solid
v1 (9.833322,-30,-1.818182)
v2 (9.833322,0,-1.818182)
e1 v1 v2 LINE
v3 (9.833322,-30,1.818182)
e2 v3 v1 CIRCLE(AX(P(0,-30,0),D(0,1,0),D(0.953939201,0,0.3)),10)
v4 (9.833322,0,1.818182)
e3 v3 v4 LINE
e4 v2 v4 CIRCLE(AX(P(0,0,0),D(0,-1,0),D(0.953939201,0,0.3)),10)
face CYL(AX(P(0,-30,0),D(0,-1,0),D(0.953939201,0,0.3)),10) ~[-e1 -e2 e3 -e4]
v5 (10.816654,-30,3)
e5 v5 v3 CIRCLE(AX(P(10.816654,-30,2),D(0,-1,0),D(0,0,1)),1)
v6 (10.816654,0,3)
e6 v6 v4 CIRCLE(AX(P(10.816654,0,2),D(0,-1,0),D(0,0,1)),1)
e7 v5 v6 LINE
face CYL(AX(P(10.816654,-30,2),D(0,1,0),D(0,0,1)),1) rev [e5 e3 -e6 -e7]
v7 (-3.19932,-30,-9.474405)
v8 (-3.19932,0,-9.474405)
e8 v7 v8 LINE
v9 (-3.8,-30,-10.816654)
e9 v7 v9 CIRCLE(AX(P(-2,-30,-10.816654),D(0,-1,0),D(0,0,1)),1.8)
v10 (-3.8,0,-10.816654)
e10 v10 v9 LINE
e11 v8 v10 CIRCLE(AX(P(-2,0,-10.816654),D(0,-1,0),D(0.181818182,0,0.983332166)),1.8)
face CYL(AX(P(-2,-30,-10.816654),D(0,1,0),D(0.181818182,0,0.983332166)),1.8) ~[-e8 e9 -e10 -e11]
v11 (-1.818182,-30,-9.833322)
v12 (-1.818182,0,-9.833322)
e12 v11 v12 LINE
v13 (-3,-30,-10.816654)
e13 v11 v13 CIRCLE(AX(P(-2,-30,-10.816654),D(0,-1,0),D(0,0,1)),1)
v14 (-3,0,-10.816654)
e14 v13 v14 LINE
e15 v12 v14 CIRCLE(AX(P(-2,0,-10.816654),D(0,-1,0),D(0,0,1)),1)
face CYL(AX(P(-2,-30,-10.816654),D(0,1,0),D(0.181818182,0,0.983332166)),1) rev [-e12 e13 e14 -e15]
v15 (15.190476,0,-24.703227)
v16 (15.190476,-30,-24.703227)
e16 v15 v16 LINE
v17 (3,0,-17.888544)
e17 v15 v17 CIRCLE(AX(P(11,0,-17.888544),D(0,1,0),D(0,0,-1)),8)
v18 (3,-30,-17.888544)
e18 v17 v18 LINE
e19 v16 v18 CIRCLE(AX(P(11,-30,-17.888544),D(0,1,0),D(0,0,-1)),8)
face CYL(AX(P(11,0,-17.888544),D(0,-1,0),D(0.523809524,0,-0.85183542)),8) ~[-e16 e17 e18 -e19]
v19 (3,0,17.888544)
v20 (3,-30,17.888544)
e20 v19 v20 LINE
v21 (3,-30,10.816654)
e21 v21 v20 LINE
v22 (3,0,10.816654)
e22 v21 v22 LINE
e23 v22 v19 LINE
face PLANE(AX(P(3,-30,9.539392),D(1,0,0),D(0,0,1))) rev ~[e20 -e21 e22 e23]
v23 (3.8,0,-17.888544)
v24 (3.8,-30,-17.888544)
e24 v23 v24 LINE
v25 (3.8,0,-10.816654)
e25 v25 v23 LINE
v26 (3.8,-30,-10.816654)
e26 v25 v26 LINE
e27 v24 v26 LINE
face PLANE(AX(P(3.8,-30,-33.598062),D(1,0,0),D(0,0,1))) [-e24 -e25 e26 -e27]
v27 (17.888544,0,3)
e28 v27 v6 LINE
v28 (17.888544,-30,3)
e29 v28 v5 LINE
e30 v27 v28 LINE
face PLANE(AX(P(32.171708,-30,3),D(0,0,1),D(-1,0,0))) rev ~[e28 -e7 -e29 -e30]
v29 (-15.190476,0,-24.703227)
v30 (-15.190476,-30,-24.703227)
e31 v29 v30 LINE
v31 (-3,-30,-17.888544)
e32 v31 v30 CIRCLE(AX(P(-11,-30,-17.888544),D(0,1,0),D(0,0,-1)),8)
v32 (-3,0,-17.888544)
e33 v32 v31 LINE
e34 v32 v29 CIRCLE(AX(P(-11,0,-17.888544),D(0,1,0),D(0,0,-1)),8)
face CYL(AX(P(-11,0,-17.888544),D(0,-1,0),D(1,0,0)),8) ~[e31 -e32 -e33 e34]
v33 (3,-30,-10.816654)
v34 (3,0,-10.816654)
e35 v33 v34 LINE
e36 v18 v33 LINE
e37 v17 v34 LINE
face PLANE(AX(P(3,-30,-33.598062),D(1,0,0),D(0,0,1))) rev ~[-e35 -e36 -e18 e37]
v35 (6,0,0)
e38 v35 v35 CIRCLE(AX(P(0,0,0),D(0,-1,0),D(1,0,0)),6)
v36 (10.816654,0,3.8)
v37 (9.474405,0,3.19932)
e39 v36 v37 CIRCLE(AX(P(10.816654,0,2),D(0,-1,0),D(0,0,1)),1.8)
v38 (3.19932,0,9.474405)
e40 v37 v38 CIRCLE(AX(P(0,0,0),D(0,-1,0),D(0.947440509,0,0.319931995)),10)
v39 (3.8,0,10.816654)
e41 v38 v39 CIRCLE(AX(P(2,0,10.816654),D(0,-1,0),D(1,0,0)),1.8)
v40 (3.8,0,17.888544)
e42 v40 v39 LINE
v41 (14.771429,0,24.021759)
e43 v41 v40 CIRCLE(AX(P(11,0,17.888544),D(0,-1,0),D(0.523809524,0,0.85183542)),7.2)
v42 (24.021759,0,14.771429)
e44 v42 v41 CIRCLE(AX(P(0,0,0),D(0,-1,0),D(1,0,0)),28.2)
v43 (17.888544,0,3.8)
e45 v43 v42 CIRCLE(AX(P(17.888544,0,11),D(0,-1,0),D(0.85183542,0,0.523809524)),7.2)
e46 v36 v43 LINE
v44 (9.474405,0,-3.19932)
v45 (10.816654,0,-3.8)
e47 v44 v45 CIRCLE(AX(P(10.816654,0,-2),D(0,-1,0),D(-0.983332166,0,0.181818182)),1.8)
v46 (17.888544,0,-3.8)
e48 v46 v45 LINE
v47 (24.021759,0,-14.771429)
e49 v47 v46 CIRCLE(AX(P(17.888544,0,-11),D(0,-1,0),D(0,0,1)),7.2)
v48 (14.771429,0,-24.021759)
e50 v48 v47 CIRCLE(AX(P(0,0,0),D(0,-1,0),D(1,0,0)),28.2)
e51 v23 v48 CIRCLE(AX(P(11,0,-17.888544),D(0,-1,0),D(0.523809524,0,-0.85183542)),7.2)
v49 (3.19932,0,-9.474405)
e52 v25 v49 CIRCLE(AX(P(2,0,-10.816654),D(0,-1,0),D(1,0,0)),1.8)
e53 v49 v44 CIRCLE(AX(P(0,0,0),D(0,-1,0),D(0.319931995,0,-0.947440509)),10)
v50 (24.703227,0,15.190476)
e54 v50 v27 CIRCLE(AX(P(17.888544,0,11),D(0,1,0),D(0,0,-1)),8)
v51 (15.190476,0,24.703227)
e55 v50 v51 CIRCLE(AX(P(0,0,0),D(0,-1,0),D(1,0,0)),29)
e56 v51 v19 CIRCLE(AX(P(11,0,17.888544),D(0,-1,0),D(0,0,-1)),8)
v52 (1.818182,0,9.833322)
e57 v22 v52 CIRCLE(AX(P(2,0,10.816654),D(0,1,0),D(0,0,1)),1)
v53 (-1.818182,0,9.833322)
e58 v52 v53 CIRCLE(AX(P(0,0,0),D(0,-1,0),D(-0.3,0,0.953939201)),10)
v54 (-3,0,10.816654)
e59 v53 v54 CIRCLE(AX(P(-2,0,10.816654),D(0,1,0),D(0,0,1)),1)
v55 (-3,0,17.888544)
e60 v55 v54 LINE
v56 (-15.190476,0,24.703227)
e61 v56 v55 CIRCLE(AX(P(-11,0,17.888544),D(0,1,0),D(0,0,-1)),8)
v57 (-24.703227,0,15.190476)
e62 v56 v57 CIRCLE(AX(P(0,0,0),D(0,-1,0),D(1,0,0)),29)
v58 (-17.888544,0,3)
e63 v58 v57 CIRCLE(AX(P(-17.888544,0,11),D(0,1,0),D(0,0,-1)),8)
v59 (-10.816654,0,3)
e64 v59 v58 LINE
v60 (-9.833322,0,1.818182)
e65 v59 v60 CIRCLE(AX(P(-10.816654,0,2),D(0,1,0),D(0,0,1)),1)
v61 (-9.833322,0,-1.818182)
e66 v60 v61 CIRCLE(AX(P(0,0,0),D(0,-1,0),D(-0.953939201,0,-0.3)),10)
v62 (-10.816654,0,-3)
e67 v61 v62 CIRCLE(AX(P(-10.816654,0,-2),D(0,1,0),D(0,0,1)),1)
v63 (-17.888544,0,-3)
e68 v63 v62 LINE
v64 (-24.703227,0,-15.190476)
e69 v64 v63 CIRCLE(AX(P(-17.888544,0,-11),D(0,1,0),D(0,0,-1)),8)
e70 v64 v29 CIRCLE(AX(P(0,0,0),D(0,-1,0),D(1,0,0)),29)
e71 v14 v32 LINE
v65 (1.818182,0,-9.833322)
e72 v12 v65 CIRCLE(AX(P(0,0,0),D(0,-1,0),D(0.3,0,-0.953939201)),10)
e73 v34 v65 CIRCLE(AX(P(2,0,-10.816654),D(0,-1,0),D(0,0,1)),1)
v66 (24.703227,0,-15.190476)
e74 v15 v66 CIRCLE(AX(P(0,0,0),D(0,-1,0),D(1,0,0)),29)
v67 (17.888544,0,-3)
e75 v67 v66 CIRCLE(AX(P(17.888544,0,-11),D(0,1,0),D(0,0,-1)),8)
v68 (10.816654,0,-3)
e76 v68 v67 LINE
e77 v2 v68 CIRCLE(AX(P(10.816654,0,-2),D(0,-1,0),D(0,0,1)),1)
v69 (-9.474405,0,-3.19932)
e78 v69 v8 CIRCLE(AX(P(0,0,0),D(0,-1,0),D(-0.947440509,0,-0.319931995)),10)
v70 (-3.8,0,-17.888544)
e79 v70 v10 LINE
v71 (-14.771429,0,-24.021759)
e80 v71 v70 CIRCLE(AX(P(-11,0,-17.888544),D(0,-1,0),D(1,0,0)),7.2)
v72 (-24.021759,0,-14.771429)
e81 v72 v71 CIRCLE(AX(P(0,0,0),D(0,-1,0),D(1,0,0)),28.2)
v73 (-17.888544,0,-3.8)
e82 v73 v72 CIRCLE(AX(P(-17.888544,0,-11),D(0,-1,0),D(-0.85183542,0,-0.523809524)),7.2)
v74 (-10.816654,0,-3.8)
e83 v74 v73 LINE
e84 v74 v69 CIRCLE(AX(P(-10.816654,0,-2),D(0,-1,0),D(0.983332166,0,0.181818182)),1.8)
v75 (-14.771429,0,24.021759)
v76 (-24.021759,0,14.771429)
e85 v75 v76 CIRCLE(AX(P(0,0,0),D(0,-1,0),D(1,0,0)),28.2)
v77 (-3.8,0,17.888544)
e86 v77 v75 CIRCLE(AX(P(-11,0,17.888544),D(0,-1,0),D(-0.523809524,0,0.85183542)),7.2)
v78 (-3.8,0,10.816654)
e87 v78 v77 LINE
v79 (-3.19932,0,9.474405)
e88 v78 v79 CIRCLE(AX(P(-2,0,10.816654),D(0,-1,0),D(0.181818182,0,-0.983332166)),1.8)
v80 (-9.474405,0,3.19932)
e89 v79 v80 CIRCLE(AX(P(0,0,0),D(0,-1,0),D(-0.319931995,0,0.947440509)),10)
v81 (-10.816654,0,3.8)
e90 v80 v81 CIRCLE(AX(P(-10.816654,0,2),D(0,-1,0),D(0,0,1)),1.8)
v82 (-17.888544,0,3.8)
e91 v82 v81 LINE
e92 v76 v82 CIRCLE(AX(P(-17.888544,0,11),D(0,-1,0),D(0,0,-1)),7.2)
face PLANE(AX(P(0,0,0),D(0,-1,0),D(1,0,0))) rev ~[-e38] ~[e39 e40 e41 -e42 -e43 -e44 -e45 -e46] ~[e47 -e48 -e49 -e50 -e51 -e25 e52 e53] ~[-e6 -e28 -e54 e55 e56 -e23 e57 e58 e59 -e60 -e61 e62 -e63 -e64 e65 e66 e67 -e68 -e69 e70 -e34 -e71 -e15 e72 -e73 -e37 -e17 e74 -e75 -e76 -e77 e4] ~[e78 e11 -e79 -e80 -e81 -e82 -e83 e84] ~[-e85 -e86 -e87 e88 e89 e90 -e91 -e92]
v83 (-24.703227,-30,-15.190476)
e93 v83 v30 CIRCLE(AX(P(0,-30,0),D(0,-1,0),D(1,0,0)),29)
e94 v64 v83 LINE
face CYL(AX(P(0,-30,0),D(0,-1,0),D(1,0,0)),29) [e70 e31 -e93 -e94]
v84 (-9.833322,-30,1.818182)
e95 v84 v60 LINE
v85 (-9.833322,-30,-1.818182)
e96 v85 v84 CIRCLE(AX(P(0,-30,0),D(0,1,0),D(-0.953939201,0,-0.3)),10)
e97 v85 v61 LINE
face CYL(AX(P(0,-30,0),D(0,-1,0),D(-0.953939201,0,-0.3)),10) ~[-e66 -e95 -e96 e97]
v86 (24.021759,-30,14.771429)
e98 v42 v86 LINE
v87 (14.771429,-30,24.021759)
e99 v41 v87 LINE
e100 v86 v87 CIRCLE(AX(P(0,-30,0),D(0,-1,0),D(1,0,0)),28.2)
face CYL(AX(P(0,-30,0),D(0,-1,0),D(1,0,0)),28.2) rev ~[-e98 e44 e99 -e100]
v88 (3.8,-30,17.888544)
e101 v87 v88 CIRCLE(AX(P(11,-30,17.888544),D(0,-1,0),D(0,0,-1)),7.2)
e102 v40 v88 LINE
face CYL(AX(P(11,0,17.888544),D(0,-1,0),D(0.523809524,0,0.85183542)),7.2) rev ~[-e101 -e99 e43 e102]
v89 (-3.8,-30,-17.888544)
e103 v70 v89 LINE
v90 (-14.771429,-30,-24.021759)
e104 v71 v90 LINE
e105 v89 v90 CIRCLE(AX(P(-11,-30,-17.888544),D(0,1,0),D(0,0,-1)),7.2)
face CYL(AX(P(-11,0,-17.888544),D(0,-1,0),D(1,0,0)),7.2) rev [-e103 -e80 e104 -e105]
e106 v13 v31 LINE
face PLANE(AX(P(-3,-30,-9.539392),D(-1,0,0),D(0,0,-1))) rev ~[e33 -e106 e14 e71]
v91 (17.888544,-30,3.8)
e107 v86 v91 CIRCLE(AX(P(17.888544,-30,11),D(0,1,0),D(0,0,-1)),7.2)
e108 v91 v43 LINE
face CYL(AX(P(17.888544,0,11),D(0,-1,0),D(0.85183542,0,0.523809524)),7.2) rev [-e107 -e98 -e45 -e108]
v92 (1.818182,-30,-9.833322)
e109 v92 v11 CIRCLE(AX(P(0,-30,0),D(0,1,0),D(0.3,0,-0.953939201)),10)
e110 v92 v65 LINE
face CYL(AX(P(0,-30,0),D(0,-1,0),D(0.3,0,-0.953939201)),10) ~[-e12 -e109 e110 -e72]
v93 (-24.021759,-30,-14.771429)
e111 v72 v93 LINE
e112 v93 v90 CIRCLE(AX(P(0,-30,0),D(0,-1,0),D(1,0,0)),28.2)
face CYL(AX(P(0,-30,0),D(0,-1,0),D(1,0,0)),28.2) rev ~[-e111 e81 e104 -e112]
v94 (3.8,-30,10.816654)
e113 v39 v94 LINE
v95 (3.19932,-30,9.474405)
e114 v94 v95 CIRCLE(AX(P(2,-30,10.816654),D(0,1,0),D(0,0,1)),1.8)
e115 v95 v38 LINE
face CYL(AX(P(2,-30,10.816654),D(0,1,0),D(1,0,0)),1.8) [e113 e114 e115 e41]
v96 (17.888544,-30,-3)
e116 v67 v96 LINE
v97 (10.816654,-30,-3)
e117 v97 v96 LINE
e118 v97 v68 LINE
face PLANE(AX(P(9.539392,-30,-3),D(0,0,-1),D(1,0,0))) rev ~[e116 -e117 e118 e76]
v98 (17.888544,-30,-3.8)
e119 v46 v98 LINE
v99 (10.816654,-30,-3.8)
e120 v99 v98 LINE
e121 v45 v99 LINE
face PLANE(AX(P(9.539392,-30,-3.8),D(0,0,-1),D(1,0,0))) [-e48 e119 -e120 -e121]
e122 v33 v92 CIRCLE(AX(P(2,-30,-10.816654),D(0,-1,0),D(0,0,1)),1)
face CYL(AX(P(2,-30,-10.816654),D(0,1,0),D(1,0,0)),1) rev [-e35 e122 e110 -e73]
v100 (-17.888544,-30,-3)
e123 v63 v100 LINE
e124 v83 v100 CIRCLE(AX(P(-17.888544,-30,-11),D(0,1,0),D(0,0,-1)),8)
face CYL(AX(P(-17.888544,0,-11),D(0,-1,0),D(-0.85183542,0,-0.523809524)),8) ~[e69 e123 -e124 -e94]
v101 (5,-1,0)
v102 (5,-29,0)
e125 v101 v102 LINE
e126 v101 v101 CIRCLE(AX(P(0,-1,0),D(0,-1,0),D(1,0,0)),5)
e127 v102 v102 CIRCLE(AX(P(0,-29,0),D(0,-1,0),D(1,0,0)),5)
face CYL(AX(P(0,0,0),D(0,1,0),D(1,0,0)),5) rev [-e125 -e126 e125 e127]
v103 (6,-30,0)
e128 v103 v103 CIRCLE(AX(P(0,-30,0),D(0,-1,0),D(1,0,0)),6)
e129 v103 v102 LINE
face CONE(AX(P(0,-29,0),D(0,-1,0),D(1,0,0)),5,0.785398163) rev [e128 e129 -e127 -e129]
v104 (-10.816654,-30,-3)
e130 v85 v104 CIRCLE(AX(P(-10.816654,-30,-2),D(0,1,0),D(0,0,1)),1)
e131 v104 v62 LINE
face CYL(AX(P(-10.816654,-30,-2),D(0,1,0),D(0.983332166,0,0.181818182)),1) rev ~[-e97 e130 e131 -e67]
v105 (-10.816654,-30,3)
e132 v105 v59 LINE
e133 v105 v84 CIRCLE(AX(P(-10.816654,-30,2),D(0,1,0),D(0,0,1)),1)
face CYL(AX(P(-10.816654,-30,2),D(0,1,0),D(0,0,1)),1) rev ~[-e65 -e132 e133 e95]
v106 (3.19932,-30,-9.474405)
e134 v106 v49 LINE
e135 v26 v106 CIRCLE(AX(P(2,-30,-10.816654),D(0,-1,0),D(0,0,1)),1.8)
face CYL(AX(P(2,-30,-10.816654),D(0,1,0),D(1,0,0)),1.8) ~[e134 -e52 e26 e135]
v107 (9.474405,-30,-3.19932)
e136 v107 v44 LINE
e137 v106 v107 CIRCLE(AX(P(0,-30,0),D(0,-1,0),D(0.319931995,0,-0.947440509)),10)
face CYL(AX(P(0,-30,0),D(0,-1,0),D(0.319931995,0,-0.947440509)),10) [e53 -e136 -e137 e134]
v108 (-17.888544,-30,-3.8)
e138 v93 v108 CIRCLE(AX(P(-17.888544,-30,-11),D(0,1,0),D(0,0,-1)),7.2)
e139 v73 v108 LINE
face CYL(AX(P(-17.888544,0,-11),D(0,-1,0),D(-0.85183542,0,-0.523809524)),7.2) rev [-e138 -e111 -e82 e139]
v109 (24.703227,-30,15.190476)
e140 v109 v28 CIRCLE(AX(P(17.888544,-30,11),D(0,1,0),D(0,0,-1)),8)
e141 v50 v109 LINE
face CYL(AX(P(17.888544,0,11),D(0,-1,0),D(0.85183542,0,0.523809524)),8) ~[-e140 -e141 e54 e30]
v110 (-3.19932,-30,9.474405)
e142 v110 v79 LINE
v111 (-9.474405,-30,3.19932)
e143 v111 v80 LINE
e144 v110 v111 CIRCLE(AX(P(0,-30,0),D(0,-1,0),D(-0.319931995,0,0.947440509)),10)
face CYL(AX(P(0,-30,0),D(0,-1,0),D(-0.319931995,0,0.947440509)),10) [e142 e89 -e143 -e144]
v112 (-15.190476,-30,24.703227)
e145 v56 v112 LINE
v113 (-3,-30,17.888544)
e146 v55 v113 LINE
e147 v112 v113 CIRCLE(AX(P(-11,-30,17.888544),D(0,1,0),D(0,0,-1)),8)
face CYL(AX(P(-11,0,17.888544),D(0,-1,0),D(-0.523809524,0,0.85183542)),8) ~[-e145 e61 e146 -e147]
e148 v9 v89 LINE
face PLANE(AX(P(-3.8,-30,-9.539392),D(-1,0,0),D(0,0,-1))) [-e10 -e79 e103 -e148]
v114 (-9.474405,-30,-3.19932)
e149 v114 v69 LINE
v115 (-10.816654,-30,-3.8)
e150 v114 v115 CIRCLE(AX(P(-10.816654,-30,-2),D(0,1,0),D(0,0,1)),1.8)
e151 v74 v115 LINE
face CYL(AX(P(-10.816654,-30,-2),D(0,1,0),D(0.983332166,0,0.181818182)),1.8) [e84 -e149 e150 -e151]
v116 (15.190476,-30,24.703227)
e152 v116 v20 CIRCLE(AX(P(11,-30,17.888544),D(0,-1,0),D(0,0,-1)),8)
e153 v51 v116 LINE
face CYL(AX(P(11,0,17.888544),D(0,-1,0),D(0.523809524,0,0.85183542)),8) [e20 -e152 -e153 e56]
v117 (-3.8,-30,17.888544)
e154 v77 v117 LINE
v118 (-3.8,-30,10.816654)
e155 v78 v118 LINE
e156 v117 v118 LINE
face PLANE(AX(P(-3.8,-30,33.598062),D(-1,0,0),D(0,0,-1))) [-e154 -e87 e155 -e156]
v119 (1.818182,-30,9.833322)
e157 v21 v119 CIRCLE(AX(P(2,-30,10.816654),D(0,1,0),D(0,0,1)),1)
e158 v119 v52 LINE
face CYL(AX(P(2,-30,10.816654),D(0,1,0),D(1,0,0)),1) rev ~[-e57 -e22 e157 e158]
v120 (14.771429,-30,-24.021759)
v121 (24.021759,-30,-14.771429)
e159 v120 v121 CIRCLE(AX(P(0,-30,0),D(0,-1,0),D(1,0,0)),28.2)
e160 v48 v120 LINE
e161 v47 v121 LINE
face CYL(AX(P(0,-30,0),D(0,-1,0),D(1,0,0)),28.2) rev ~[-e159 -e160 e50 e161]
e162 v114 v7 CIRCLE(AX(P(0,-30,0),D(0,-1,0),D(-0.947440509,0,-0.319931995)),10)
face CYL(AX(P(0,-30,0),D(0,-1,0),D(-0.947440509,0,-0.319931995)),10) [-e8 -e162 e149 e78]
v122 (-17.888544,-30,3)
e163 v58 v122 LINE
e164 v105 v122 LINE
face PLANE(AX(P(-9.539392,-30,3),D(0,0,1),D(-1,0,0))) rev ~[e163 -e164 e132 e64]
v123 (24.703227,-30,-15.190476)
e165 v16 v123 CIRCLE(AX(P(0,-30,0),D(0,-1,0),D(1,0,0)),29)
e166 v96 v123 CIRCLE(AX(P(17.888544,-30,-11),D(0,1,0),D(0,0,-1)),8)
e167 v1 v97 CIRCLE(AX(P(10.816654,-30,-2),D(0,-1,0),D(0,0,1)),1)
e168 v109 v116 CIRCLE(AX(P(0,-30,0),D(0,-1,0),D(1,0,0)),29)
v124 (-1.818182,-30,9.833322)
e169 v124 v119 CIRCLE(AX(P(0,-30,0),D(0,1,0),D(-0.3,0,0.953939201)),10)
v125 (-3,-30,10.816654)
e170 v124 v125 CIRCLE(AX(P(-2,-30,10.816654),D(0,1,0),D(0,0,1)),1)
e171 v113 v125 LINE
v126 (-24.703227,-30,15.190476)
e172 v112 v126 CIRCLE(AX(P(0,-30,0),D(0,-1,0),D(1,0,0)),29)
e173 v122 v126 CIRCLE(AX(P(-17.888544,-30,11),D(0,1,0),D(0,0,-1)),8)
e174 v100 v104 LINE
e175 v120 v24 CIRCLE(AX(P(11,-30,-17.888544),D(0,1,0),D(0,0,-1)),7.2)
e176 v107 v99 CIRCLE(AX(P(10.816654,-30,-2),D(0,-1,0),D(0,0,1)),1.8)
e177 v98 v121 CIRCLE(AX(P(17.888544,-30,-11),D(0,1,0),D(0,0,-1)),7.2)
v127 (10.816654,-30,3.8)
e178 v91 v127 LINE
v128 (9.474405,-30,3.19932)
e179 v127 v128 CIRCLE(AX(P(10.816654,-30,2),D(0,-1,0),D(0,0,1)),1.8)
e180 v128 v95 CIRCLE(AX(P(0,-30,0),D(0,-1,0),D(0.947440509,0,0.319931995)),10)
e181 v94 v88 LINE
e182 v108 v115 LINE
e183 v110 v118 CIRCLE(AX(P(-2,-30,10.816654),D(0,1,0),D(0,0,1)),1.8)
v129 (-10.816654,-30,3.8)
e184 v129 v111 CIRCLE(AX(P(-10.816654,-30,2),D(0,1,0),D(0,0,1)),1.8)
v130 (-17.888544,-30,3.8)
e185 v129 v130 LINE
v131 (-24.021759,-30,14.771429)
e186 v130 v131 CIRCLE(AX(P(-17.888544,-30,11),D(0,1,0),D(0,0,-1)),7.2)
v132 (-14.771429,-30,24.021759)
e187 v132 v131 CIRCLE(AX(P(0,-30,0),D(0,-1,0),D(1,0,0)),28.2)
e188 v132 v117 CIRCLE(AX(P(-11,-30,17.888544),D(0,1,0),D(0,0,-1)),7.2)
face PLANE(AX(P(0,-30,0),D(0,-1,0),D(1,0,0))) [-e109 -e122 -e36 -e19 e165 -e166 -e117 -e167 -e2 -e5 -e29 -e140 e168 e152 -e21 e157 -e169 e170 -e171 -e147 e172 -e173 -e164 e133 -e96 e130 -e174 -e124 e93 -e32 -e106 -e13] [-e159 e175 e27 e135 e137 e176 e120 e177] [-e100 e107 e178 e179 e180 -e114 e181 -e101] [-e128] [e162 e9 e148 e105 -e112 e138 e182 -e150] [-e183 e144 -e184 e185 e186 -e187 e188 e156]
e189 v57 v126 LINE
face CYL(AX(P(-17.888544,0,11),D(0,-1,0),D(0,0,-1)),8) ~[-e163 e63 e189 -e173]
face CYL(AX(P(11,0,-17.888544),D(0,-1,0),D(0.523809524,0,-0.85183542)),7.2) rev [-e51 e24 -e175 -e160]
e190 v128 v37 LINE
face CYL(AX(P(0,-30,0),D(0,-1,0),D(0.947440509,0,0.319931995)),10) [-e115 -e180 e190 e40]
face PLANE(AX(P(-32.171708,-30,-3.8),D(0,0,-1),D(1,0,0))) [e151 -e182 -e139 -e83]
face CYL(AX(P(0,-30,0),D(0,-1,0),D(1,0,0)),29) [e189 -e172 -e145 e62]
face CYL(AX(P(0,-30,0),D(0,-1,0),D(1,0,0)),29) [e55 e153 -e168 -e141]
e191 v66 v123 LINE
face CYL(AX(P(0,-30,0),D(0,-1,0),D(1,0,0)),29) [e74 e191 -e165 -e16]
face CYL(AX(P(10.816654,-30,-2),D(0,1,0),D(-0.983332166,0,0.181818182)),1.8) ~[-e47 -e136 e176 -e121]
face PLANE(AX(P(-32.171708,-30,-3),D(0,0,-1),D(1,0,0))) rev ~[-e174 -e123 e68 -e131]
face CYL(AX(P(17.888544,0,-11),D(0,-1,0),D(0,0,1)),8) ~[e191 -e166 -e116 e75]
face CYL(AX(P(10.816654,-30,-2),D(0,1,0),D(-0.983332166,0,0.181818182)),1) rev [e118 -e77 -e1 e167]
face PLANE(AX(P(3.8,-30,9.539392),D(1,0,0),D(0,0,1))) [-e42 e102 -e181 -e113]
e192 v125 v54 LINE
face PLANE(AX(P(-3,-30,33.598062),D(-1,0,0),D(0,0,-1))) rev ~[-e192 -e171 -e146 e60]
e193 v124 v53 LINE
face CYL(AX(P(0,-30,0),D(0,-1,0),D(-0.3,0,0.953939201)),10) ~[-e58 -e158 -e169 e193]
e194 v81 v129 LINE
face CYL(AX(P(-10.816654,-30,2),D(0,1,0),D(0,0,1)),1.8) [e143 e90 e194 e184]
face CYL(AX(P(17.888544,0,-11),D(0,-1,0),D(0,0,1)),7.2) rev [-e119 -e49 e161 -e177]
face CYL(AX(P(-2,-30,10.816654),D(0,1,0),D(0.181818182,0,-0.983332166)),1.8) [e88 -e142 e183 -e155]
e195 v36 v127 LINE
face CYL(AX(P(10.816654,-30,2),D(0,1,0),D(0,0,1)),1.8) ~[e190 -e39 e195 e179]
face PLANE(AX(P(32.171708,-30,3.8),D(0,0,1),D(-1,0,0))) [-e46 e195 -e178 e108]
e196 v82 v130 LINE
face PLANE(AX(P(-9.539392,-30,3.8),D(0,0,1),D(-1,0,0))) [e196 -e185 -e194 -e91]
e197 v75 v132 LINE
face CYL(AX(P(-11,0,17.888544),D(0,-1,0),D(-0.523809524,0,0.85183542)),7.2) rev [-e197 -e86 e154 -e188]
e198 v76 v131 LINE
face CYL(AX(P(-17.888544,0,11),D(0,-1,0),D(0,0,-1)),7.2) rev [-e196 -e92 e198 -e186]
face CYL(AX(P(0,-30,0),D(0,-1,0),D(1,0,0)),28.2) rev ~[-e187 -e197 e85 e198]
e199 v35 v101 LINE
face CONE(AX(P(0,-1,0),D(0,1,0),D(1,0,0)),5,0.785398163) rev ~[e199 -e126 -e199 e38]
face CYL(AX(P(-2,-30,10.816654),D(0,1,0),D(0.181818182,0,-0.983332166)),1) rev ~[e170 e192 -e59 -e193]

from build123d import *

# Parameters (mm, degrees)
F0_R      = 10
F0_R_2    = 5
F1_DEPTH  = 30
F2_R      = 29
F2_R_2    = 10
F3_DEPTH  = 30
F5_DEPTH  = 30.001
F6_R      = 8
F7_R      = 1
F8_T      = -0.8
F9_DEPTH  = 25
F10_R     = 5.8
F10_R_2   = 5
F11_DEPTH = 30
F12_SIZE  = 1


with BuildPart() as f1:
    # F0 (on Front) → F1 (new body)
    with BuildSketch(Plane.XZ):
        Circle(F0_R)
        Circle(F0_R_2, mode=Mode.SUBTRACT)
    extrude(amount=F1_DEPTH)

    # F2 (on face) → F3 (join, through all)
    with BuildSketch(Plane.XZ.offset(30)):
        Circle(F2_R)
        Circle(F2_R_2, mode=Mode.SUBTRACT)
    extrude(amount=-F3_DEPTH)

    # F4 (on face) → F5 (cut, through all)
    with BuildSketch(Plane.XZ.offset(30)):
        with BuildLine():
            ThreePointArc((-9.5393920142, -3), (-10, 0), (-9.5393920142, 3))
            Line((-9.5393920142, 3), (-32.1717076004, 3))
            Line((-32.1717076004, 3), (-32.1717076004, -3))
            Line((-32.1717076004, -3), (-9.5393920142, -3))
        make_face()
        with BuildLine():
            Line((-3, -33.598061651), (3, -33.598061651))
            Line((3, -33.598061651), (3, -9.5393920142))
            ThreePointArc((3, -9.5393920142), (0, -10), (-3, -9.5393920142))
            Line((-3, -9.5393920142), (-3, -33.598061651))
        make_face()
        with BuildLine():
            Line((3, 9.5393920142), (3, 33.598061651))
            Line((3, 33.598061651), (-3, 33.598061651))
            Line((-3, 33.598061651), (-3, 9.5393920142))
            ThreePointArc((-3, 9.5393920142), (0, 10), (3, 9.5393920142))
        make_face()
        with BuildLine():
            Line((9.5393920142, -3), (32.1717076004, -3))
            Line((32.1717076004, -3), (32.1717076004, 3))
            Line((32.1717076004, 3), (9.5393920142, 3))
            ThreePointArc((9.5393920142, 3), (10, 0), (9.5393920142, -3))
        make_face()
    extrude(amount=-F5_DEPTH, mode=Mode.SUBTRACT)

    # F6
    f6_edges = [f1.edges().sort_by_distance(p)[0] for p in [
        (-3, -15, 28.84441),
        (-28.84441, -15, 3),
        (-28.84441, -15, -3),
        (3, -15, 28.84441),
        (-3, -15, -28.84441),
        (3, -15, -28.84441),
        (28.84441, -15, -3),
        (28.84441, -15, 3),
    ]]
    fillet(f6_edges, radius=F6_R)

    # F7
    f7_edges = [f1.edges().sort_by_distance(p)[0] for p in [
        (-9.539392, -15, 3),
        (-9.539392, -15, -3),
        (-3, -15, -9.539392),
        (3, -15, -9.539392),
        (9.539392, -15, 3),
        (9.539392, -15, -3),
        (-3, -15, 9.539392),
        (3, -15, 9.539392),
    ]]
    fillet(f7_edges, radius=F7_R)

    # F8
    f8_openings = [f1.faces().sort_by_distance(p)[0] for p in [
        (14.352599, -30, 3.732239),
    ]]
    offset(amount=F8_T, openings=f8_openings)

    # F9 (cut): faces of the model
    f9_faces = [f1.faces().sort_by_distance(p)[0] for p in [
        (14.3525988232, -0.8, 4.5096111786),
        (14.3525988232, -0.8, 4.5096111786),
        (14.3525988232, -0.8, 4.5096111786),
        (14.3525988232, -0.8, 4.5096111786),
    ]]
    extrude(f9_faces, amount=-F9_DEPTH, mode=Mode.SUBTRACT)

    # F10 (on face) → F11 (join, through all)
    with BuildSketch(Plane.XZ.offset(30)):
        with BuildLine():
            ThreePointArc((9.0466559275, 1.6727272727), (9.083408006, 2.4856530923), (9.4744050932, 3.1993199482))
            ThreePointArc((9.4744050932, 3.1993199482), (7.0710678119, 7.0710678119), (3.1993199482, 9.4744050932))
            ThreePointArc((3.1993199482, 9.4744050932), (2.4856530923, 9.083408006), (1.6727272727, 9.0466559275))
            ThreePointArc((1.6727272727, 9.0466559275), (0, 9.2), (-1.6727272727, 9.0466559275))
            ThreePointArc((-1.6727272727, 9.0466559275), (-2.4856530923, 9.083408006), (-3.1993199482, 9.4744050932))
            ThreePointArc((-3.1993199482, 9.4744050932), (-7.0710678119, 7.0710678119), (-9.4744050932, 3.1993199482))
            ThreePointArc((-9.4744050932, 3.1993199482), (-9.083408006, 2.4856530923), (-9.0466559275, 1.6727272727))
            ThreePointArc((-9.0466559275, 1.6727272727), (-9.2, 0), (-9.0466559275, -1.6727272727))
            ThreePointArc((-9.0466559275, -1.6727272727), (-9.083408006, -2.4856530923), (-9.4744050932, -3.1993199482))
            ThreePointArc((-9.4744050932, -3.1993199482), (-7.0710678119, -7.0710678119), (-3.1993199482, -9.4744050932))
            ThreePointArc((-3.1993199482, -9.4744050932), (-2.4856530923, -9.083408006), (-1.6727272727, -9.0466559275))
            ThreePointArc((-1.6727272727, -9.0466559275), (0, -9.2), (1.6727272727, -9.0466559275))
            ThreePointArc((1.6727272727, -9.0466559275), (2.4856530923, -9.083408006), (3.1993199482, -9.4744050932))
            ThreePointArc((3.1993199482, -9.4744050932), (7.0710678119, -7.0710678119), (9.4744050932, -3.1993199482))
            ThreePointArc((9.4744050932, -3.1993199482), (9.083408006, -2.4856530923), (9.0466559275, -1.6727272727))
            ThreePointArc((9.0466559275, -1.6727272727), (9.2, 0), (9.0466559275, 1.6727272727))
        make_face()
        Circle(F10_R, mode=Mode.SUBTRACT)
        Circle(F10_R)
        Circle(F10_R_2, mode=Mode.SUBTRACT)
    extrude(amount=-F11_DEPTH)

    # F12
    f12_edges = [f1.edges().sort_by_distance(p)[0] for p in [
        (5, -15, 0),
        (-5, 0, 0),
        (-5, -30, 0),
    ]]
    chamfer(f12_edges, length=F12_SIZE)


solid = f1.part
